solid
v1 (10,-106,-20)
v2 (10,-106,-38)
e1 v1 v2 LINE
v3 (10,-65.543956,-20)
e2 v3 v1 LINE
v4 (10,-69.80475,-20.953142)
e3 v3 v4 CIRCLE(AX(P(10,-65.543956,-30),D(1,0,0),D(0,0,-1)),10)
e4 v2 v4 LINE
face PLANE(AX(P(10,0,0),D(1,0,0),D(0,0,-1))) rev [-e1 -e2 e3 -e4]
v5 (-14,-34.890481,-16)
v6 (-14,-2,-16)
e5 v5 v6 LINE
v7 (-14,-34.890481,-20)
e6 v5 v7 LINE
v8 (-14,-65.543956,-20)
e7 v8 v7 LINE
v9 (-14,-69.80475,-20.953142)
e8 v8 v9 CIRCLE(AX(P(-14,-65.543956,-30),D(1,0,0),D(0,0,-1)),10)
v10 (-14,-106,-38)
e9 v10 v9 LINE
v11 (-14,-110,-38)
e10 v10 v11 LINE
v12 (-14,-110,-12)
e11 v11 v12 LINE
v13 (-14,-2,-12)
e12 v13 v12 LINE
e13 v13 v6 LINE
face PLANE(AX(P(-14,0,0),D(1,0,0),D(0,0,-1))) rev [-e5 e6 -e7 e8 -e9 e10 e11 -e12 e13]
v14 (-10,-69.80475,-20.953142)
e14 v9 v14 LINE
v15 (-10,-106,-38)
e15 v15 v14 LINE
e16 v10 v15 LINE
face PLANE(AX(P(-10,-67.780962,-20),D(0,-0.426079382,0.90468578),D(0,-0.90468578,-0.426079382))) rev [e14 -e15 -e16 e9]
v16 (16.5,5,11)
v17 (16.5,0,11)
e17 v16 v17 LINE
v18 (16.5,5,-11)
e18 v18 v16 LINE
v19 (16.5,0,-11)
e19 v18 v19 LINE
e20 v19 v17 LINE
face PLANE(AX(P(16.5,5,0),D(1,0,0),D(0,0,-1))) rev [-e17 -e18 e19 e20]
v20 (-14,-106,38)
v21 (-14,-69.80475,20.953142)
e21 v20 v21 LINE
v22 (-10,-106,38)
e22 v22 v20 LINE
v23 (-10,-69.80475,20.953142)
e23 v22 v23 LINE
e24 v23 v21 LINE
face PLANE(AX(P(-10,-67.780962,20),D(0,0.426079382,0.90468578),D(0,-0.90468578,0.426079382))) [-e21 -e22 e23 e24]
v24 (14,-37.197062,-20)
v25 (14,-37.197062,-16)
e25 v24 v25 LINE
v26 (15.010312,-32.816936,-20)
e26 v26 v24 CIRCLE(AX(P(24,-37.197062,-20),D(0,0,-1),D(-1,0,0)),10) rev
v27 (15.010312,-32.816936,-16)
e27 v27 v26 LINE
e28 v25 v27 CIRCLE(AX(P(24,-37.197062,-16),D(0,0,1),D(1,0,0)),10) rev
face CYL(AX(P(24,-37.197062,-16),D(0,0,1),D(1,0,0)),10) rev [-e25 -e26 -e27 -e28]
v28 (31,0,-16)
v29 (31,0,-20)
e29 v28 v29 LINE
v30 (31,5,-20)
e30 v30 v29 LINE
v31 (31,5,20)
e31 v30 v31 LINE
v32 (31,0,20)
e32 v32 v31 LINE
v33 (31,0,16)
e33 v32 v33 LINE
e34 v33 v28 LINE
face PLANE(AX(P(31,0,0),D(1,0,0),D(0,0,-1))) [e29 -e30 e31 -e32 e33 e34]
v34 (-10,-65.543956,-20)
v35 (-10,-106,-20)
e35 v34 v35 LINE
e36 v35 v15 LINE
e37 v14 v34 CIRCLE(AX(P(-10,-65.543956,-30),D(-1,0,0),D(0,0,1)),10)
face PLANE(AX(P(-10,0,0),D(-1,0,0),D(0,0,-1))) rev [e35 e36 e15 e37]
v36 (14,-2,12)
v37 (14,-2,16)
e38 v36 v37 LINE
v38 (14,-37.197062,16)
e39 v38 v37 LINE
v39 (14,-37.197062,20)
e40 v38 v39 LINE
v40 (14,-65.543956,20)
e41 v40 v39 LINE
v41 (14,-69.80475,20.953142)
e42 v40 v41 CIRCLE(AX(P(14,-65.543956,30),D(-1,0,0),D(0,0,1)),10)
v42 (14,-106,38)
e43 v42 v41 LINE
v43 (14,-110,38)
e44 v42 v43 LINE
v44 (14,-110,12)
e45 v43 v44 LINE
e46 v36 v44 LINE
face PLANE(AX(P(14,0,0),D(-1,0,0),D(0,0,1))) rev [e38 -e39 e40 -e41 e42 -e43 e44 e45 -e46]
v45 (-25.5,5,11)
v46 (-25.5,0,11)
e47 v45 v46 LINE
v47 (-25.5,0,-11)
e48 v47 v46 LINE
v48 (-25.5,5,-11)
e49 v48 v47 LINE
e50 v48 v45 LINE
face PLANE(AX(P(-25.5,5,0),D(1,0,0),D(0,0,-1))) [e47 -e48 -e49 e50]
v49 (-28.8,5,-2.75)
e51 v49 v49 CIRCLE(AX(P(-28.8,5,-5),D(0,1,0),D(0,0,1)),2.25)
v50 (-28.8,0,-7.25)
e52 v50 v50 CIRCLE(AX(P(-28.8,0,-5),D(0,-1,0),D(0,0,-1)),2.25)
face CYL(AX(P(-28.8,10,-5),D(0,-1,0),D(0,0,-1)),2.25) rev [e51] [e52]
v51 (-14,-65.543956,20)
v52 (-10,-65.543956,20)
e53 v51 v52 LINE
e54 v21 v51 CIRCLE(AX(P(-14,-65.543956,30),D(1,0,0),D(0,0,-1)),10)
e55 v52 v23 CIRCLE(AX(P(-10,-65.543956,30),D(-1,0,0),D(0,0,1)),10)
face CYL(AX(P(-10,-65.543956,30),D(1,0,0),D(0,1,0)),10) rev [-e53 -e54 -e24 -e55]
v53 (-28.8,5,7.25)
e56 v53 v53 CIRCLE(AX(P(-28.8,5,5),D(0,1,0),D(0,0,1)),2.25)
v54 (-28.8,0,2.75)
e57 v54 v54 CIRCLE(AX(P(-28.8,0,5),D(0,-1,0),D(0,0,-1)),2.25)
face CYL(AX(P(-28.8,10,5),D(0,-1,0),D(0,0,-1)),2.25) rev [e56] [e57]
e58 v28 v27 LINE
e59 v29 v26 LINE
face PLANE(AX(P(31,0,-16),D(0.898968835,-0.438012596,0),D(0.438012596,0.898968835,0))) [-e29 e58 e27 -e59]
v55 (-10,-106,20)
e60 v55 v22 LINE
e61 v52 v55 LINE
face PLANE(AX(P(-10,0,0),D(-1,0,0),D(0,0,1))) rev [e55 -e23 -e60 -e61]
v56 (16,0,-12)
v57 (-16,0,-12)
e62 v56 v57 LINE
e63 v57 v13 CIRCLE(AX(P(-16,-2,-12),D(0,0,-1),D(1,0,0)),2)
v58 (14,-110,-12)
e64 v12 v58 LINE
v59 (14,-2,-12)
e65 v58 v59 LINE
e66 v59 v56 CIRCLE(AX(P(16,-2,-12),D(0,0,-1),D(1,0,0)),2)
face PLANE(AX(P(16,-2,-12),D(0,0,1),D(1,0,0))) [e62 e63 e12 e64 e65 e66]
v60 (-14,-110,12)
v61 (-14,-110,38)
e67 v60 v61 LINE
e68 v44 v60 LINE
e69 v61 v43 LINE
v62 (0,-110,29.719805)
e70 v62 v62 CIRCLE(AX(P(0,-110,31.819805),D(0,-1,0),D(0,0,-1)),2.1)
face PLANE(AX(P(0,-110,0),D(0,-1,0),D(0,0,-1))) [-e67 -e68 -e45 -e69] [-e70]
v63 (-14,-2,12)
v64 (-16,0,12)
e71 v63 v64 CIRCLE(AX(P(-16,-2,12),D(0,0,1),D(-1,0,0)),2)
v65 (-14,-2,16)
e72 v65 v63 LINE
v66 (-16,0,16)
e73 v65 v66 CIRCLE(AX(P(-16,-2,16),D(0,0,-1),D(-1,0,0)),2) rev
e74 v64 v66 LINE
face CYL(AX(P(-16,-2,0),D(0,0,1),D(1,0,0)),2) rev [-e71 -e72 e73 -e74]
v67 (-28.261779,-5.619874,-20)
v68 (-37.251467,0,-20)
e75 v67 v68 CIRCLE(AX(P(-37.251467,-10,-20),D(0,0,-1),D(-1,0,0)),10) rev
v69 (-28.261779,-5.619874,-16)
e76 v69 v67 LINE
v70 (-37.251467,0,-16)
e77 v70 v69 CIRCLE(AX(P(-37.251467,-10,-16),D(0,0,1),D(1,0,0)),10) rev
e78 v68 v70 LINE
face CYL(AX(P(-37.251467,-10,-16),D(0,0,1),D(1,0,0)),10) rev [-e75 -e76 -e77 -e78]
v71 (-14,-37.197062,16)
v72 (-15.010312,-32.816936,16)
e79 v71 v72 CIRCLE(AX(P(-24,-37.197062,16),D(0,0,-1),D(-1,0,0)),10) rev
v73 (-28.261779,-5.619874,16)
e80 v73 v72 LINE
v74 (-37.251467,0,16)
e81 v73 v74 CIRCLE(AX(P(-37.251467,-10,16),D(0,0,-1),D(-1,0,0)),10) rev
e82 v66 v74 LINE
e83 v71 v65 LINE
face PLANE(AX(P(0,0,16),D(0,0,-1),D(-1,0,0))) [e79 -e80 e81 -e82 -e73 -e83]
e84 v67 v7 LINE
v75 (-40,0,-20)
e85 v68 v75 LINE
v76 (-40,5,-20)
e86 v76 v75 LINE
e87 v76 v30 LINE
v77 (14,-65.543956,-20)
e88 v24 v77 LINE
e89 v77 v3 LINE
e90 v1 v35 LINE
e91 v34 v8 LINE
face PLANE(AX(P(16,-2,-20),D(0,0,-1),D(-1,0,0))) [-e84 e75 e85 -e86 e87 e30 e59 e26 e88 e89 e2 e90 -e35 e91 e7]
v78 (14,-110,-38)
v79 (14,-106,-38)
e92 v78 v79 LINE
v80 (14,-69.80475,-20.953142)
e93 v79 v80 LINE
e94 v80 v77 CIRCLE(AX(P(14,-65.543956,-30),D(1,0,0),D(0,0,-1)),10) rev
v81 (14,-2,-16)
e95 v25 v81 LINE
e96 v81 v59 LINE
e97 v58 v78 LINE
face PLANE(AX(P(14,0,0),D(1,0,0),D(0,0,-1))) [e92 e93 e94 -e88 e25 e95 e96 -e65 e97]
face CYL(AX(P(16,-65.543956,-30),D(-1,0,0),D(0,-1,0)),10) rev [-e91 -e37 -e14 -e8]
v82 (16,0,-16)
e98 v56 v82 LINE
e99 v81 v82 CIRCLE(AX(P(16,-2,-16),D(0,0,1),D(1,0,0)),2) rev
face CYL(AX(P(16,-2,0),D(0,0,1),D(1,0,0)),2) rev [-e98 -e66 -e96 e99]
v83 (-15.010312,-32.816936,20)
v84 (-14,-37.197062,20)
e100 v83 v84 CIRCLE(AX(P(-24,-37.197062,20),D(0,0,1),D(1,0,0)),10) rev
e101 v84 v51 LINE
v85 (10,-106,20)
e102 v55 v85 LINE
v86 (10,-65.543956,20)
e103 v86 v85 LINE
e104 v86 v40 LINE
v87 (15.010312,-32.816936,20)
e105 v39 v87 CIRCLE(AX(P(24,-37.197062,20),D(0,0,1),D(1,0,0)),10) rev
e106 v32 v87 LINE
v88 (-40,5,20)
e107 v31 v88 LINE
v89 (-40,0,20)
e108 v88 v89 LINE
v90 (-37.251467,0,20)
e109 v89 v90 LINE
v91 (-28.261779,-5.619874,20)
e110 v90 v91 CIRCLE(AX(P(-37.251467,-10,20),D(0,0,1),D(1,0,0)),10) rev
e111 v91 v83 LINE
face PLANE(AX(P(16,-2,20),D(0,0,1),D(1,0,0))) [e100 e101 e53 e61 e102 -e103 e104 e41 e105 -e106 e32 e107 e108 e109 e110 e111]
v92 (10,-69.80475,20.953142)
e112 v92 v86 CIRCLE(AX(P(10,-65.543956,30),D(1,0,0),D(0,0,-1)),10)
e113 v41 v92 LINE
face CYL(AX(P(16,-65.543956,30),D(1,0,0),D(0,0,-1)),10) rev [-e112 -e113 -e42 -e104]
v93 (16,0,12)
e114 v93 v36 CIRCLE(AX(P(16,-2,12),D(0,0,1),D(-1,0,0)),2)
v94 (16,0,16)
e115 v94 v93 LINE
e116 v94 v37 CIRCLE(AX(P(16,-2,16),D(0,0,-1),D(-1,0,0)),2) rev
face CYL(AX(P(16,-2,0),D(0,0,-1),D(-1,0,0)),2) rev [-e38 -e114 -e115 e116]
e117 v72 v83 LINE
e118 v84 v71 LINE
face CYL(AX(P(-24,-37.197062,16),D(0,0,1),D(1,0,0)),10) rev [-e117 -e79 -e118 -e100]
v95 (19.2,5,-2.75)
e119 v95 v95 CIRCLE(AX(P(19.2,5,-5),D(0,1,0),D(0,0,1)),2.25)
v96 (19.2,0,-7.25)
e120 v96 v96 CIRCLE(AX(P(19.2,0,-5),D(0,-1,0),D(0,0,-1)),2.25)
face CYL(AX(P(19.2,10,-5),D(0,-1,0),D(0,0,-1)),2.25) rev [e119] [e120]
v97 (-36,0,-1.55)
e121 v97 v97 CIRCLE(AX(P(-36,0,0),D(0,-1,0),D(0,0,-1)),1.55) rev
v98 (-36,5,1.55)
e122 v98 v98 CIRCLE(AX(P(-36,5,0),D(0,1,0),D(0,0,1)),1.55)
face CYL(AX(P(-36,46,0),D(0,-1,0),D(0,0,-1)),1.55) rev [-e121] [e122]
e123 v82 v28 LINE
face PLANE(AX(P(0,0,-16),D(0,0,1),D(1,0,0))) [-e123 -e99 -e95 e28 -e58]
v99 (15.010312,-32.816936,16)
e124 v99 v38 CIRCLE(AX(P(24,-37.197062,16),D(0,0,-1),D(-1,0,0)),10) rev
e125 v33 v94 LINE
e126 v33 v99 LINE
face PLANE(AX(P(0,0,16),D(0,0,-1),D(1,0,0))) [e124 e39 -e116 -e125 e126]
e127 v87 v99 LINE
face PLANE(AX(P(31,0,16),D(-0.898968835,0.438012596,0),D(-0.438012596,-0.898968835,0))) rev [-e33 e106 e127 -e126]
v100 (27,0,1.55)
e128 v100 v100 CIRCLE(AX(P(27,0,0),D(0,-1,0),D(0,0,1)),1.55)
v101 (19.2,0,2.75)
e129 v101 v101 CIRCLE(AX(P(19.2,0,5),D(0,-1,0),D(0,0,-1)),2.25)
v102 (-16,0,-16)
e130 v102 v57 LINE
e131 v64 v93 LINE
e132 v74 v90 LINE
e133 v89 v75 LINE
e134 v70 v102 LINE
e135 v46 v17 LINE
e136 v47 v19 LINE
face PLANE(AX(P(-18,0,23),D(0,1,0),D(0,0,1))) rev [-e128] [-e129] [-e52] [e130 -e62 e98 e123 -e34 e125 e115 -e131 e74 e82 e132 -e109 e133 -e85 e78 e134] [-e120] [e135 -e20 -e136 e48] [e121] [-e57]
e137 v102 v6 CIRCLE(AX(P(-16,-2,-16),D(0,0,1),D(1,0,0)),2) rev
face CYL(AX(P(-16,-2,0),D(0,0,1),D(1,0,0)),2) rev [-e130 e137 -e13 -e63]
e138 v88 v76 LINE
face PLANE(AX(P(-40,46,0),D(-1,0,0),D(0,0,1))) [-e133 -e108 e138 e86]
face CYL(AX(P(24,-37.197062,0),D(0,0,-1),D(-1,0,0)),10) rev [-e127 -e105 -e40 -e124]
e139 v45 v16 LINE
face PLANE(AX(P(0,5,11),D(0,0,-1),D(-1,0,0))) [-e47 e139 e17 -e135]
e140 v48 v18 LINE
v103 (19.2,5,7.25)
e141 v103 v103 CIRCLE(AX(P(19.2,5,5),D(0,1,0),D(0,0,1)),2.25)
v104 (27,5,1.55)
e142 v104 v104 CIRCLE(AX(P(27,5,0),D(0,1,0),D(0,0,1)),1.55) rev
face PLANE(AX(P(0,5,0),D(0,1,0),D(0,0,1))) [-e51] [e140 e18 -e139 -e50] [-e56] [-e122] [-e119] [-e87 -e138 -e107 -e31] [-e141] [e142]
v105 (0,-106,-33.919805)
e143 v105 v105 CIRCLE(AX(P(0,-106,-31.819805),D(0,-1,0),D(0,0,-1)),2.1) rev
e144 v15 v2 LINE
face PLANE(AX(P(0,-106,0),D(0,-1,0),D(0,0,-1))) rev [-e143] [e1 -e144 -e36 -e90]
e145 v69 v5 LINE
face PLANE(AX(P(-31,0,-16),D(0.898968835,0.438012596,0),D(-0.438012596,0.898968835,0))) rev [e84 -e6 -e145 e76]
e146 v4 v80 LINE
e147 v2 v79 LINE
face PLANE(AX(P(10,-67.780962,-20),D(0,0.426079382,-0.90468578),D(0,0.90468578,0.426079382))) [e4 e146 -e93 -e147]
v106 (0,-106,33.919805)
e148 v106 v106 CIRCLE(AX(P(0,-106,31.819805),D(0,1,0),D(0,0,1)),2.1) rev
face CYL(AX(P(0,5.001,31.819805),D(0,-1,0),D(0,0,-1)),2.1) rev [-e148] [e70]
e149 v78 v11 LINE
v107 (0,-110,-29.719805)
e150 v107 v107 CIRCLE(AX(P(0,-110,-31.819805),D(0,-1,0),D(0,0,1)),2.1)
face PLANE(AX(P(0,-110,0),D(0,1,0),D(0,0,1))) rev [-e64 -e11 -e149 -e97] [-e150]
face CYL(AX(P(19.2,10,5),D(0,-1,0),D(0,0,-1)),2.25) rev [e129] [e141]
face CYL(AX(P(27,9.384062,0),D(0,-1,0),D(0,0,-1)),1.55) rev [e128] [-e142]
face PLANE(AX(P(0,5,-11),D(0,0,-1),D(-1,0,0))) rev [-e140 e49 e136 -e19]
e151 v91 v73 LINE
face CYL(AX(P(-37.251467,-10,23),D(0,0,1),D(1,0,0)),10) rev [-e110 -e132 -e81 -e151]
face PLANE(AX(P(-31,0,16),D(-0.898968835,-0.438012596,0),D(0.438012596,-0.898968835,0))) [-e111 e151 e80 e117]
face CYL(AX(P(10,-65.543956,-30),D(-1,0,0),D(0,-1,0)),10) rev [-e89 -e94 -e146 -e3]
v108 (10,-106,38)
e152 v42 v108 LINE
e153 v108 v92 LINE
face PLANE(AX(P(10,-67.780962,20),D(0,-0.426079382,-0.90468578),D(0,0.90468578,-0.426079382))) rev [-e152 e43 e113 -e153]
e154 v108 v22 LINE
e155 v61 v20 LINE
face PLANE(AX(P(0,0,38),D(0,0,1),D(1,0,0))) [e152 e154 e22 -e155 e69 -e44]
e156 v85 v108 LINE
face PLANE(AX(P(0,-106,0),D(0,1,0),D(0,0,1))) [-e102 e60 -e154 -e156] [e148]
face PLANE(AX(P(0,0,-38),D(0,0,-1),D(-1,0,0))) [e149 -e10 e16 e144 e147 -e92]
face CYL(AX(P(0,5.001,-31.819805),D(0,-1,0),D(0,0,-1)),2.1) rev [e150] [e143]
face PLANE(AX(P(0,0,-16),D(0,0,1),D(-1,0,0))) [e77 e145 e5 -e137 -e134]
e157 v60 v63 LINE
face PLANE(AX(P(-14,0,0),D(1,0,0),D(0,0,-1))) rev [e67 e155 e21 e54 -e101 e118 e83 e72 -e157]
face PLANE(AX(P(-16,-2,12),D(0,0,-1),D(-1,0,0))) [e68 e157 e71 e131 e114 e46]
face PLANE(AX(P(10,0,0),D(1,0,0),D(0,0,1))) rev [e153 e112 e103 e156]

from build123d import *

# Parameters (mm, degrees)
SKETCH_1_W                                = 36
SKETCH_1_H                                = 30
EXTRUDE_1_DEPTH                           = 5
SKETCH_11_W                               = 36
SKETCH_11_H                               = 8
EXTRUDE_3_DEPTH                           = 110
SKETCH_12_W                               = 36
SKETCH_12_H                               = 8
EXTRUDE_4_DEPTH                           = 4
SKETCH_17_W                               = 36
SKETCH_17_H                               = 5
EXTRUDE_5_DEPTH                           = 8
SKETCH_18_W                               = 36
SKETCH_18_H                               = 5
EXTRUDE_6_DEPTH                           = 8
SKETCH_20_W                               = 36
SKETCH_20_H                               = 4
EXTRUDE_7_DEPTH                           = 15
SKETCH_21_W                               = 36
SKETCH_21_H                               = 4
EXTRUDE_8_DEPTH                           = 15
CUT_EXTRUDE_8_REACH                       = 124.446
SKETCH_22_R                               = 2.1
CUT_EXTRUDE_9_REACH                       = 124.446
SKETCH_23_R                               = 1.55
CUT_EXTRUDE_10_REACH                      = 119.762
SKETCH_26_R                               = 1
SKETCH_26_W                               = 23.5
SKETCH_26_H                               = 12
CUT_EXTRUDE_11_DEPTH                      = 2
CUT_EXTRUDE_12_DEPTH                      = 2
CUT_EXTRUDE_13_DEPTH                      = 2
CUT_EXTRUDE_14_DEPTH                      = 2
SKETCH_32_W                               = 28
SKETCH_32_H                               = 106
CUT_EXTRUDE_15_DEPTH                      = 2
SKETCH_33_W                               = 28
SKETCH_33_H                               = 106
CUT_EXTRUDE_16_DEPTH                      = 2
EXTRUDE_START                             = 2
SKETCH_34_W                               = 32
SKETCH_34_H                               = 14.000594261
SKETCH_34_R                               = 1
SKETCH_34_W_2                             = 23.5
SKETCH_34_H_2                             = 12
EXTRUDE_12_DEPTH                          = 2
CUT_EXTRUDE_START                         = -2
CUT_EXTRUDE_17_OUTLINE_R                  = 1
CUT_EXTRUDE_17_OUTLINE_W                  = 23.5
CUT_EXTRUDE_17_OUTLINE_H                  = 12
CUT_EXTRUDE_17_DEPTH                      = 2
SKETCH_36_W                               = 46
SKETCH_36_H                               = 5
EXTRUDE_13_DEPTH                          = 15
SKETCH_37_W                               = 46
SKETCH_37_H                               = 5
EXTRUDE_14_DEPTH                          = 15
SKETCH_38_R                               = 1.55
CUT_EXTRUDE_18_DEPTH                      = 5
CUT_EXTRUDE_19_REACH                      = 122.437
SKETCH_39_W                               = 62
SKETCH_39_H                               = 10
FILLET_3_R                                = 2
EXTRUDE_15_DEPTH                          = 7
EXTRUDE_16_DEPTH                          = 7
CUT_EXTRUDE_20_DEPTH                      = 5
CUT_EXTRUDE_21_DEPTH                      = 5
CUT_EXTRUDE_22_DEPTH                      = 5
SKETCH_46_W                               = 9
SKETCH_46_H                               = 40
SKETCH_46_R                               = 1.55
EXTRUDE_17_DEPTH                          = 5
EXTRUDE_18_DEPTH                          = 5
SKETCH_48_R                               = 2.25
CUT_EXTRUDE_23_DEPTH                      = 10
EXTRUDE_19_DEPTH                          = 4
MIRROR_1_AT_THE_SECOND_PLANE_COPY_1_DEPTH = 4
EXTRUDE_20_DEPTH                          = 4
MIRROR_2_AT_THE_SECOND_PLANE_COPY_1_DEPTH = 4
FILLET_4_R                                = 10


# Read off the part's stored shape, not the designer's step: 切除-拉伸17
with BuildPart() as part:
    # 草图1 → 凸台-拉伸1 (new body)
    with BuildSketch(Plane(origin=(0, 0, 0), x_dir=(1, 0, 0), z_dir=(0, 1, 0))):
        Rectangle(SKETCH_1_W, SKETCH_1_H)
    extrude(amount=EXTRUDE_1_DEPTH)

    # 草图11 → 凸台-拉伸3 (add)
    with BuildSketch(Plane.XZ):
        with Locations((0, 11)):
            Rectangle(SKETCH_11_W, SKETCH_11_H)
        with Locations((0, -11)):
            Rectangle(SKETCH_11_W, SKETCH_11_H)
    extrude(amount=EXTRUDE_3_DEPTH)

    # 草图12 → 凸台-拉伸4 (add)
    with BuildSketch(Plane.XZ.offset(110)):
        with Locations((0, 19)):
            Rectangle(SKETCH_12_W, SKETCH_12_H)
        with Locations((0, -19)):
            Rectangle(SKETCH_12_W, SKETCH_12_H)
    extrude(amount=-EXTRUDE_4_DEPTH)

    # 草图17 → 凸台-拉伸5 (add)
    with BuildSketch(Plane(origin=(0, 0, -15), x_dir=(-1, 0, 0), z_dir=(0, 0, -1))):
        with Locations((0, 2.5)):
            Rectangle(SKETCH_17_W, SKETCH_17_H)
    extrude(amount=EXTRUDE_5_DEPTH)

    # 草图18 → 凸台-拉伸6 (add)
    with BuildSketch(Plane.XY.offset(15)):
        with Locations((0, 2.5)):
            Rectangle(SKETCH_18_W, SKETCH_18_H)
    extrude(amount=EXTRUDE_6_DEPTH)

    # 草图20 → 凸台-拉伸7 (add)
    with BuildSketch(Plane.XY.offset(23)):
        with Locations((0, -108)):
            Rectangle(SKETCH_20_W, SKETCH_20_H)
    extrude(amount=EXTRUDE_7_DEPTH)

    # 草图21 → 凸台-拉伸8 (add)
    with BuildSketch(Plane(origin=(0, 0, -23), x_dir=(-1, 0, 0), z_dir=(0, 0, -1))):
        with Locations((0, -108)):
            Rectangle(SKETCH_21_W, SKETCH_21_H)
    extrude(amount=EXTRUDE_8_DEPTH)

    # 草图22 → 切除-拉伸8 (cut, up to next)
    with BuildSketch(Plane.XZ.offset(110), mode=Mode.PRIVATE) as cut_extrude_8_sk1:
        with Locations(Location((0, 31.819805155, 0), (0, 0, 270))):
            Circle(SKETCH_22_R)
    cut_extrude_8_tool1 = extrude(cut_extrude_8_sk1.sketch, amount=-CUT_EXTRUDE_8_REACH, mode=Mode.PRIVATE) & part.part
    # 草图22 → 切除-拉伸8 (cut, up to next)
    with BuildSketch(Plane.XZ.offset(110), mode=Mode.PRIVATE) as cut_extrude_8_sk2:
        with Locations(Location((0, -31.819805155, 0), (0, 0, 270))):
            Circle(SKETCH_22_R)
    cut_extrude_8_tool2 = extrude(cut_extrude_8_sk2.sketch, amount=-CUT_EXTRUDE_8_REACH, mode=Mode.PRIVATE) & part.part
    add(cut_extrude_8_tool1.solids().sort_by_distance((0, -110, 31.819805))[0], mode=Mode.SUBTRACT)
    add(cut_extrude_8_tool2.solids().sort_by_distance((0, -110, -31.819805))[0], mode=Mode.SUBTRACT)

    # 草图23 → 切除-拉伸9 (cut, up to next)
    with BuildSketch(Plane(origin=(0, 5, 0), x_dir=(1, 0, 0), z_dir=(0, 1, 0)), mode=Mode.PRIVATE) as cut_extrude_9_sk1:
        with Locations(Location((0, 18, 0), (0, 0, 270))):
            Circle(SKETCH_23_R)
    cut_extrude_9_tool1 = extrude(cut_extrude_9_sk1.sketch, amount=-CUT_EXTRUDE_9_REACH, mode=Mode.PRIVATE) & part.part
    # 草图23 → 切除-拉伸9 (cut, up to next)
    with BuildSketch(Plane(origin=(0, 5, 0), x_dir=(1, 0, 0), z_dir=(0, 1, 0)), mode=Mode.PRIVATE) as cut_extrude_9_sk2:
        with Locations(Location((0, -18, 0), (0, 0, 270))):
            Circle(SKETCH_23_R)
    cut_extrude_9_tool2 = extrude(cut_extrude_9_sk2.sketch, amount=-CUT_EXTRUDE_9_REACH, mode=Mode.PRIVATE) & part.part
    add(cut_extrude_9_tool1.solids().sort_by_distance((0, 5, -18))[0], mode=Mode.SUBTRACT)
    add(cut_extrude_9_tool2.solids().sort_by_distance((0, 5, 18))[0], mode=Mode.SUBTRACT)

    # 草图26 → 切除-拉伸10 (cut, up to next)
    with BuildSketch(Plane(origin=(0, 0, 0), x_dir=(-1, 0, 0), z_dir=(0, -1, 0)), mode=Mode.PRIVATE) as cut_extrude_10_sk1:
        with Locations(Location((-14, 0, 0), (0, 0, 90))):
            Circle(SKETCH_26_R)
    cut_extrude_10_tool1 = extrude(cut_extrude_10_sk1.sketch, amount=-CUT_EXTRUDE_10_REACH, mode=Mode.PRIVATE) & part.part
    # 草图26 → 切除-拉伸10 (cut, up to next)
    with BuildSketch(Plane(origin=(0, 0, 0), x_dir=(-1, 0, 0), z_dir=(0, -1, 0)), mode=Mode.PRIVATE) as cut_extrude_10_sk2:
        with Locations(Location((14, 0, 0), (0, 0, 270))):
            Circle(SKETCH_26_R)
    cut_extrude_10_tool2 = extrude(cut_extrude_10_sk2.sketch, amount=-CUT_EXTRUDE_10_REACH, mode=Mode.PRIVATE) & part.part
    # 草图26 → 切除-拉伸10 (cut, up to next)
    with BuildSketch(Plane(origin=(0, 0, 0), x_dir=(-1, 0, 0), z_dir=(0, -1, 0)), mode=Mode.PRIVATE) as cut_extrude_10_sk3:
        Rectangle(SKETCH_26_W, SKETCH_26_H)
    cut_extrude_10_tool3 = extrude(cut_extrude_10_sk3.sketch, amount=-CUT_EXTRUDE_10_REACH, mode=Mode.PRIVATE) & part.part
    add(cut_extrude_10_tool1.solids().sort_by_distance((14, 0, 0))[0], mode=Mode.SUBTRACT)
    add(cut_extrude_10_tool2.solids().sort_by_distance((-14, 0, 0))[0], mode=Mode.SUBTRACT)
    add(cut_extrude_10_tool3.solids().sort_by_distance((0, 0, 0))[0], mode=Mode.SUBTRACT)

    # 草图28 → 切除-拉伸11 (cut)
    with BuildSketch(Plane(origin=(18, 0, 0), x_dir=(0, 0, -1), z_dir=(1, 0, 0))):
        Polygon((23, 5), (-23, 5), (-23, 0), (-15, 0), (-15, -106), (-38, -106), (-38, -110), (-7, -110), (-7, 0), (7, 0), (7, -110), (38, -110), (38, -106), (15, -106), (15, 0), (23, 0), align=None)
    extrude(amount=-CUT_EXTRUDE_11_DEPTH, mode=Mode.SUBTRACT)

    # 草图29 → 切除-拉伸12 (cut)
    with BuildSketch(Plane.ZY.offset(18)):
        Polygon((23, 5), (-23, 5), (-23, 0), (-15, 0), (-15, -106), (-38, -106), (-38, -110), (-7, -110), (-7, 0), (7, 0), (7, -110), (38, -110), (38, -106), (15, -106), (15, 0), (23, 0), align=None)
    extrude(amount=-CUT_EXTRUDE_12_DEPTH, mode=Mode.SUBTRACT)

    # 草图30 → 切除-拉伸13 (cut)
    with BuildSketch(Plane(origin=(16, 0, 0), x_dir=(0, 0, -1), z_dir=(1, 0, 0))):
        Polygon((-15, 0), (-7, 0), (-7, -110), (-38, -110), (-38, -106), (-15, -106), align=None)
        Polygon((7, 0), (15, 0), (15, -106), (38, -106), (38, -110), (7, -110), align=None)
    extrude(amount=-CUT_EXTRUDE_13_DEPTH, mode=Mode.SUBTRACT)

    # 草图31 → 切除-拉伸14 (cut)
    with BuildSketch(Plane.ZY.offset(16)):
        Polygon((-7, 0), (-7, -110), (-38, -110), (-38, -106), (-15, -106), (-15, 0), align=None)
        Polygon((15, 0), (15, -106), (38, -106), (38, -110), (7, -110), (7, 0), align=None)
    extrude(amount=-CUT_EXTRUDE_14_DEPTH, mode=Mode.SUBTRACT)

    # 草图32 → 切除-拉伸15 (cut)
    with BuildSketch(Plane.XY.offset(15)):
        with Locations((0, -53)):
            Rectangle(SKETCH_32_W, SKETCH_32_H)
    extrude(amount=-CUT_EXTRUDE_15_DEPTH, mode=Mode.SUBTRACT)

    # 草图33 → 切除-拉伸16 (cut)
    with BuildSketch(Plane(origin=(0, 0, -15), x_dir=(-1, 0, 0), z_dir=(0, 0, -1))):
        with Locations((0, -53)):
            Rectangle(SKETCH_33_W, SKETCH_33_H)
    extrude(amount=-CUT_EXTRUDE_16_DEPTH, mode=Mode.SUBTRACT)

    # 草图34 → 凸台-拉伸12 (add)
    with BuildSketch(Plane.XZ.offset(EXTRUDE_START)):
        with Locations((0, 0.000297131)):
            Rectangle(SKETCH_34_W, SKETCH_34_H)
        with Locations(Location((14, 0, 0), (0, 0, 270))):
            Circle(SKETCH_34_R, mode=Mode.SUBTRACT)
        with Locations(Location((-14, 0, 0), (0, 0, 270))):
            Circle(SKETCH_34_R, mode=Mode.SUBTRACT)
        Rectangle(SKETCH_34_W_2, SKETCH_34_H_2, mode=Mode.SUBTRACT)
    extrude(amount=-EXTRUDE_12_DEPTH)

    # 切除-拉伸17 outline → 切除-拉伸17 (cut)
    with BuildSketch(Plane.XZ.offset(2).offset(CUT_EXTRUDE_START)):
        Polygon((-16, -7), (16, -7), (16, 7.000594261), (14, 7.000594261), (14, 7), (-14, 7), (-14, 7.000594261), (-16, 7.000594261), align=None)
        with Locations((-14, 0)):
            Circle(CUT_EXTRUDE_17_OUTLINE_R, mode=Mode.SUBTRACT)
        Rectangle(CUT_EXTRUDE_17_OUTLINE_W, CUT_EXTRUDE_17_OUTLINE_H, mode=Mode.SUBTRACT)
        with Locations((14, 0)):
            Circle(CUT_EXTRUDE_17_OUTLINE_R, mode=Mode.SUBTRACT)
    extrude(amount=CUT_EXTRUDE_17_DEPTH, mode=Mode.SUBTRACT)

    # 草图36 → 凸台-拉伸13 (add)
    with BuildSketch(Plane.ZY.offset(16)):
        with Locations((0, 2.5)):
            Rectangle(SKETCH_36_W, SKETCH_36_H)
    extrude(amount=EXTRUDE_13_DEPTH)

    # 草图37 → 凸台-拉伸14 (add)
    with BuildSketch(Plane(origin=(16, 0, 0), x_dir=(0, 0, -1), z_dir=(1, 0, 0))):
        with Locations((0, 2.5)):
            Rectangle(SKETCH_37_W, SKETCH_37_H)
    extrude(amount=EXTRUDE_14_DEPTH)

    # 草图38 → 切除-拉伸18 (cut)
    with BuildSketch(Plane.XZ):
        with Locations(Location((-27, 0, 0), (0, 0, 270))):
            Circle(SKETCH_38_R)
        with Locations(Location((27, 0, 0), (0, 0, 90))):
            Circle(SKETCH_38_R)
    extrude(amount=-CUT_EXTRUDE_18_DEPTH, mode=Mode.SUBTRACT)

    # 草图39 → 切除-拉伸19 (cut, up to next)
    with BuildSketch(Plane.XZ, mode=Mode.PRIVATE) as cut_extrude_19_sk1:
        with Locations((0, 18)):
            Rectangle(SKETCH_39_W, SKETCH_39_H)
    cut_extrude_19_tool1 = extrude(cut_extrude_19_sk1.sketch, amount=-CUT_EXTRUDE_19_REACH, mode=Mode.PRIVATE) & part.part
    # 草图39 → 切除-拉伸19 (cut, up to next)
    with BuildSketch(Plane.XZ, mode=Mode.PRIVATE) as cut_extrude_19_sk2:
        with Locations((0, -18)):
            Rectangle(SKETCH_39_W, SKETCH_39_H)
    cut_extrude_19_tool2 = extrude(cut_extrude_19_sk2.sketch, amount=-CUT_EXTRUDE_19_REACH, mode=Mode.PRIVATE) & part.part
    add(cut_extrude_19_tool1.solids().sort_by_distance((0, 0, 18))[0], mode=Mode.SUBTRACT)
    add(cut_extrude_19_tool2.solids().sort_by_distance((0, 0, -18))[0], mode=Mode.SUBTRACT)

    # 圆角3
    fillet_3_edges = [part.edges().sort_by_distance(p)[0] for p in [
        (-14, 0, -10),
        (-14, 0, 10),
        (14, 0, -10),
        (14, 0, 10),
    ]]
    fillet(fillet_3_edges, radius=FILLET_3_R)

    # 草图40 → 凸台-拉伸15 (add)
    with BuildSketch(Plane.XY.offset(13)):
        with BuildLine():
            Line((14, -106), (14, -2))
            ThreePointArc((14, -2), (14.585786438, -0.585786438), (16, 0))
            Line((16, 0), (31, 0))
            Line((31, 0), (31, 5))
            Line((31, 5), (-31, 5))
            Line((-31, 5), (-31, 0))
            Line((-31, 0), (-16, 0))
            ThreePointArc((-16, 0), (-14.585786438, -0.585786438), (-14, -2))
            Line((-14, -2), (-14, -106))
            Line((-14, -106), (14, -106))
        make_face()
    extrude(amount=EXTRUDE_15_DEPTH)

    # 草图41 → 凸台-拉伸16 (add)
    with BuildSketch(Plane(origin=(0, 0, -13), x_dir=(-1, 0, 0), z_dir=(0, 0, -1))):
        with BuildLine():
            Line((-31, 0), (-16, 0))
            ThreePointArc((-16, 0), (-14.585786438, -0.585786438), (-14, -2))
            Line((-14, -2), (-14, -106))
            Line((-14, -106), (14, -106))
            Line((14, -106), (14, -2))
            ThreePointArc((14, -2), (14.585786438, -0.585786438), (16, 0))
            Line((16, 0), (31, 0))
            Line((31, 0), (31, 5))
            Line((31, 5), (-31, 5))
            Line((-31, 5), (-31, 0))
        make_face()
    extrude(amount=EXTRUDE_16_DEPTH)

    # 草图42 → 切除-拉伸20 (cut)
    with BuildSketch(Plane(origin=(0, 0, 7), x_dir=(-1, 0, 0), z_dir=(0, 0, -1))):
        with BuildLine():
            Line((14, -110), (14, -2))
            ThreePointArc((14, -2), (14.585786438, -0.585786438), (16, 0))
            Line((16, 0), (-16, 0))
            ThreePointArc((-16, 0), (-14.585786438, -0.585786438), (-14, -2))
            Line((-14, -2), (-14, -110))
            Line((-14, -110), (14, -110))
        make_face()
    extrude(amount=-CUT_EXTRUDE_20_DEPTH, mode=Mode.SUBTRACT)

    # 草图43 → 切除-拉伸21 (cut)
    with BuildSketch(Plane.XY.offset(-7)):
        with BuildLine():
            Line((-14, -110), (14, -110))
            Line((14, -110), (14, -2))
            ThreePointArc((14, -2), (14.585786438, -0.585786438), (16, 0))
            Line((16, 0), (-16, 0))
            ThreePointArc((-16, 0), (-14.585786438, -0.585786438), (-14, -2))
            Line((-14, -2), (-14, -110))
        make_face()
    extrude(amount=-CUT_EXTRUDE_21_DEPTH, mode=Mode.SUBTRACT)

    # 草图45 → 切除-拉伸22 (cut)
    with BuildSketch(Plane.XZ):
        with BuildLine():
            Line((-25.5, -11), (16.5, -11))
            Line((16.5, -11), (16.5, 0))
            Line((16.5, 0), (15, 0))
            ThreePointArc((15, 0), (14, -1), (13, 0))
            Line((13, 0), (11.75, 0))
            Line((11.75, 0), (11.75, -6))
            Line((11.75, -6), (-11.75, -6))
            Line((-11.75, -6), (-11.75, 0))
            Line((-11.75, 0), (-13, 0))
            ThreePointArc((-13, 0), (-14, -1), (-15, 0))
            Line((-15, 0), (-25.45, 0))
            ThreePointArc((-25.45, 0), (-25.462550814, -0.196850197), (-25.5, -0.390512484))
            Line((-25.5, -0.390512484), (-25.5, -11))
        make_face()
        with BuildLine():
            Line((15, 0), (16.5, 0))
            Line((16.5, 0), (16.5, 11))
            Line((16.5, 11), (-25.5, 11))
            Line((-25.5, 11), (-25.5, 0.390512484))
            ThreePointArc((-25.5, 0.390512484), (-25.462550814, 0.196850197), (-25.45, 0))
            Line((-25.45, 0), (-15, 0))
            ThreePointArc((-15, 0), (-14, 1), (-13, 0))
            Line((-13, 0), (-11.75, 0))
            Line((-11.75, 0), (-11.75, 6))
            Line((-11.75, 6), (11.75, 6))
            Line((11.75, 6), (11.75, 0))
            Line((11.75, 0), (13, 0))
            ThreePointArc((13, 0), (14, 1), (15, 0))
        make_face()
    extrude(amount=-CUT_EXTRUDE_22_DEPTH, mode=Mode.SUBTRACT)

    # 草图46 → 凸台-拉伸17 (add)
    with BuildSketch(Plane.XZ):
        with Locations((-35.5, 0)):
            Rectangle(SKETCH_46_W, SKETCH_46_H)
        with Locations(Location((-36, 0, 0), (0, 0, 270))):
            Circle(SKETCH_46_R, mode=Mode.SUBTRACT)
    extrude(amount=-EXTRUDE_17_DEPTH)

    # 草图47 → 凸台-拉伸18 (add)
    with BuildSketch(Plane.XZ):
        with BuildLine():
            Line((-25.5, 0.390512484), (-25.5, -0.390512484))
            ThreePointArc((-25.5, -0.390512484), (-28.55, 0), (-25.5, 0.390512484))
        make_face()
    extrude(amount=-EXTRUDE_18_DEPTH)

    # 草图48 → 切除-拉伸23 (cut)
    with BuildSketch(Plane.XZ):
        with Locations(Location((-28.8, 5, 0), (0, 0, 270))):
            Circle(SKETCH_48_R)
        with Locations(Location((-28.8, -5, 0), (0, 0, 270))):
            Circle(SKETCH_48_R)
        with Locations(Location((19.2, 5, 0), (0, 0, 270))):
            Circle(SKETCH_48_R)
        with Locations(Location((19.2, -5, 0), (0, 0, 270))):
            Circle(SKETCH_48_R)
    extrude(amount=-CUT_EXTRUDE_23_DEPTH, mode=Mode.SUBTRACT)

    # 草图49 → 凸台-拉伸19 (add)
    with BuildSketch(Plane.ZY.offset(14)):
        Polygon((20, -67.780962131), (38, -106), (20, -106), align=None)
    extrude_19 = extrude(amount=-EXTRUDE_19_DEPTH)

    # 镜向1: 凸台-拉伸19 across plane
    add(extrude_19.mirror(Plane(origin=(0, 0, 0), x_dir=(1, 0, 0), z_dir=(0, 0, -1))))

    # 镜向1 at the second plane: 凸台-拉伸19 across plane
    add(extrude_19.mirror(Plane.ZY))

    # 镜向1 at the second plane copy 1 sket → 镜向1 at the second plane copy 1 (add)
    with BuildSketch(Plane(origin=(14, 0, 0), x_dir=(0, 0, -1), z_dir=(1, 0, 0))):
        Polygon((20, -67.780962131), (38, -106), (20, -106), align=None)
    extrude(amount=-MIRROR_1_AT_THE_SECOND_PLANE_COPY_1_DEPTH)

    # 草图50 → 凸台-拉伸20 (add)
    with BuildSketch(Plane(origin=(0, 0, -20), x_dir=(-1, 0, 0), z_dir=(0, 0, -1))):
        Polygon((-31, 0), (-14, -34.890481065), (-14, 1.365552743), align=None)
    extrude_20 = extrude(amount=-EXTRUDE_20_DEPTH)

    # 镜向2: 凸台-拉伸20 across plane
    add(extrude_20.mirror(Plane(origin=(0, 0, 0), x_dir=(1, 0, 0), z_dir=(0, 0, -1))))

    # 镜向2 at the second plane: 凸台-拉伸20 across plane
    add(extrude_20.mirror(Plane.ZY))

    # 镜向2 at the second plane copy 1 sket → 镜向2 at the second plane copy 1 (add)
    with BuildSketch(Plane.XY.offset(20)):
        Polygon((-31, 0), (-14, -34.890481065), (-14, 1.365552743), align=None)
    extrude(amount=-MIRROR_2_AT_THE_SECOND_PLANE_COPY_1_DEPTH)

    # 圆角4
    fillet_4_edges = [part.edges().sort_by_distance(p)[0] for p in [
        (-31, 0, 18),
        (-14, -34.890481065, 18),
        (-12, -67.780962131, 20),
        (12, -67.780962131, 20),
        (-12, -67.780962131, -20),
        (12, -67.780962131, -20),
        (14, -34.890481065, -18),
        (-31, 0, -18),
        (14, -34.890481065, 18),
    ]]
    fillet(fillet_4_edges, radius=FILLET_4_R)


solid = part.part
